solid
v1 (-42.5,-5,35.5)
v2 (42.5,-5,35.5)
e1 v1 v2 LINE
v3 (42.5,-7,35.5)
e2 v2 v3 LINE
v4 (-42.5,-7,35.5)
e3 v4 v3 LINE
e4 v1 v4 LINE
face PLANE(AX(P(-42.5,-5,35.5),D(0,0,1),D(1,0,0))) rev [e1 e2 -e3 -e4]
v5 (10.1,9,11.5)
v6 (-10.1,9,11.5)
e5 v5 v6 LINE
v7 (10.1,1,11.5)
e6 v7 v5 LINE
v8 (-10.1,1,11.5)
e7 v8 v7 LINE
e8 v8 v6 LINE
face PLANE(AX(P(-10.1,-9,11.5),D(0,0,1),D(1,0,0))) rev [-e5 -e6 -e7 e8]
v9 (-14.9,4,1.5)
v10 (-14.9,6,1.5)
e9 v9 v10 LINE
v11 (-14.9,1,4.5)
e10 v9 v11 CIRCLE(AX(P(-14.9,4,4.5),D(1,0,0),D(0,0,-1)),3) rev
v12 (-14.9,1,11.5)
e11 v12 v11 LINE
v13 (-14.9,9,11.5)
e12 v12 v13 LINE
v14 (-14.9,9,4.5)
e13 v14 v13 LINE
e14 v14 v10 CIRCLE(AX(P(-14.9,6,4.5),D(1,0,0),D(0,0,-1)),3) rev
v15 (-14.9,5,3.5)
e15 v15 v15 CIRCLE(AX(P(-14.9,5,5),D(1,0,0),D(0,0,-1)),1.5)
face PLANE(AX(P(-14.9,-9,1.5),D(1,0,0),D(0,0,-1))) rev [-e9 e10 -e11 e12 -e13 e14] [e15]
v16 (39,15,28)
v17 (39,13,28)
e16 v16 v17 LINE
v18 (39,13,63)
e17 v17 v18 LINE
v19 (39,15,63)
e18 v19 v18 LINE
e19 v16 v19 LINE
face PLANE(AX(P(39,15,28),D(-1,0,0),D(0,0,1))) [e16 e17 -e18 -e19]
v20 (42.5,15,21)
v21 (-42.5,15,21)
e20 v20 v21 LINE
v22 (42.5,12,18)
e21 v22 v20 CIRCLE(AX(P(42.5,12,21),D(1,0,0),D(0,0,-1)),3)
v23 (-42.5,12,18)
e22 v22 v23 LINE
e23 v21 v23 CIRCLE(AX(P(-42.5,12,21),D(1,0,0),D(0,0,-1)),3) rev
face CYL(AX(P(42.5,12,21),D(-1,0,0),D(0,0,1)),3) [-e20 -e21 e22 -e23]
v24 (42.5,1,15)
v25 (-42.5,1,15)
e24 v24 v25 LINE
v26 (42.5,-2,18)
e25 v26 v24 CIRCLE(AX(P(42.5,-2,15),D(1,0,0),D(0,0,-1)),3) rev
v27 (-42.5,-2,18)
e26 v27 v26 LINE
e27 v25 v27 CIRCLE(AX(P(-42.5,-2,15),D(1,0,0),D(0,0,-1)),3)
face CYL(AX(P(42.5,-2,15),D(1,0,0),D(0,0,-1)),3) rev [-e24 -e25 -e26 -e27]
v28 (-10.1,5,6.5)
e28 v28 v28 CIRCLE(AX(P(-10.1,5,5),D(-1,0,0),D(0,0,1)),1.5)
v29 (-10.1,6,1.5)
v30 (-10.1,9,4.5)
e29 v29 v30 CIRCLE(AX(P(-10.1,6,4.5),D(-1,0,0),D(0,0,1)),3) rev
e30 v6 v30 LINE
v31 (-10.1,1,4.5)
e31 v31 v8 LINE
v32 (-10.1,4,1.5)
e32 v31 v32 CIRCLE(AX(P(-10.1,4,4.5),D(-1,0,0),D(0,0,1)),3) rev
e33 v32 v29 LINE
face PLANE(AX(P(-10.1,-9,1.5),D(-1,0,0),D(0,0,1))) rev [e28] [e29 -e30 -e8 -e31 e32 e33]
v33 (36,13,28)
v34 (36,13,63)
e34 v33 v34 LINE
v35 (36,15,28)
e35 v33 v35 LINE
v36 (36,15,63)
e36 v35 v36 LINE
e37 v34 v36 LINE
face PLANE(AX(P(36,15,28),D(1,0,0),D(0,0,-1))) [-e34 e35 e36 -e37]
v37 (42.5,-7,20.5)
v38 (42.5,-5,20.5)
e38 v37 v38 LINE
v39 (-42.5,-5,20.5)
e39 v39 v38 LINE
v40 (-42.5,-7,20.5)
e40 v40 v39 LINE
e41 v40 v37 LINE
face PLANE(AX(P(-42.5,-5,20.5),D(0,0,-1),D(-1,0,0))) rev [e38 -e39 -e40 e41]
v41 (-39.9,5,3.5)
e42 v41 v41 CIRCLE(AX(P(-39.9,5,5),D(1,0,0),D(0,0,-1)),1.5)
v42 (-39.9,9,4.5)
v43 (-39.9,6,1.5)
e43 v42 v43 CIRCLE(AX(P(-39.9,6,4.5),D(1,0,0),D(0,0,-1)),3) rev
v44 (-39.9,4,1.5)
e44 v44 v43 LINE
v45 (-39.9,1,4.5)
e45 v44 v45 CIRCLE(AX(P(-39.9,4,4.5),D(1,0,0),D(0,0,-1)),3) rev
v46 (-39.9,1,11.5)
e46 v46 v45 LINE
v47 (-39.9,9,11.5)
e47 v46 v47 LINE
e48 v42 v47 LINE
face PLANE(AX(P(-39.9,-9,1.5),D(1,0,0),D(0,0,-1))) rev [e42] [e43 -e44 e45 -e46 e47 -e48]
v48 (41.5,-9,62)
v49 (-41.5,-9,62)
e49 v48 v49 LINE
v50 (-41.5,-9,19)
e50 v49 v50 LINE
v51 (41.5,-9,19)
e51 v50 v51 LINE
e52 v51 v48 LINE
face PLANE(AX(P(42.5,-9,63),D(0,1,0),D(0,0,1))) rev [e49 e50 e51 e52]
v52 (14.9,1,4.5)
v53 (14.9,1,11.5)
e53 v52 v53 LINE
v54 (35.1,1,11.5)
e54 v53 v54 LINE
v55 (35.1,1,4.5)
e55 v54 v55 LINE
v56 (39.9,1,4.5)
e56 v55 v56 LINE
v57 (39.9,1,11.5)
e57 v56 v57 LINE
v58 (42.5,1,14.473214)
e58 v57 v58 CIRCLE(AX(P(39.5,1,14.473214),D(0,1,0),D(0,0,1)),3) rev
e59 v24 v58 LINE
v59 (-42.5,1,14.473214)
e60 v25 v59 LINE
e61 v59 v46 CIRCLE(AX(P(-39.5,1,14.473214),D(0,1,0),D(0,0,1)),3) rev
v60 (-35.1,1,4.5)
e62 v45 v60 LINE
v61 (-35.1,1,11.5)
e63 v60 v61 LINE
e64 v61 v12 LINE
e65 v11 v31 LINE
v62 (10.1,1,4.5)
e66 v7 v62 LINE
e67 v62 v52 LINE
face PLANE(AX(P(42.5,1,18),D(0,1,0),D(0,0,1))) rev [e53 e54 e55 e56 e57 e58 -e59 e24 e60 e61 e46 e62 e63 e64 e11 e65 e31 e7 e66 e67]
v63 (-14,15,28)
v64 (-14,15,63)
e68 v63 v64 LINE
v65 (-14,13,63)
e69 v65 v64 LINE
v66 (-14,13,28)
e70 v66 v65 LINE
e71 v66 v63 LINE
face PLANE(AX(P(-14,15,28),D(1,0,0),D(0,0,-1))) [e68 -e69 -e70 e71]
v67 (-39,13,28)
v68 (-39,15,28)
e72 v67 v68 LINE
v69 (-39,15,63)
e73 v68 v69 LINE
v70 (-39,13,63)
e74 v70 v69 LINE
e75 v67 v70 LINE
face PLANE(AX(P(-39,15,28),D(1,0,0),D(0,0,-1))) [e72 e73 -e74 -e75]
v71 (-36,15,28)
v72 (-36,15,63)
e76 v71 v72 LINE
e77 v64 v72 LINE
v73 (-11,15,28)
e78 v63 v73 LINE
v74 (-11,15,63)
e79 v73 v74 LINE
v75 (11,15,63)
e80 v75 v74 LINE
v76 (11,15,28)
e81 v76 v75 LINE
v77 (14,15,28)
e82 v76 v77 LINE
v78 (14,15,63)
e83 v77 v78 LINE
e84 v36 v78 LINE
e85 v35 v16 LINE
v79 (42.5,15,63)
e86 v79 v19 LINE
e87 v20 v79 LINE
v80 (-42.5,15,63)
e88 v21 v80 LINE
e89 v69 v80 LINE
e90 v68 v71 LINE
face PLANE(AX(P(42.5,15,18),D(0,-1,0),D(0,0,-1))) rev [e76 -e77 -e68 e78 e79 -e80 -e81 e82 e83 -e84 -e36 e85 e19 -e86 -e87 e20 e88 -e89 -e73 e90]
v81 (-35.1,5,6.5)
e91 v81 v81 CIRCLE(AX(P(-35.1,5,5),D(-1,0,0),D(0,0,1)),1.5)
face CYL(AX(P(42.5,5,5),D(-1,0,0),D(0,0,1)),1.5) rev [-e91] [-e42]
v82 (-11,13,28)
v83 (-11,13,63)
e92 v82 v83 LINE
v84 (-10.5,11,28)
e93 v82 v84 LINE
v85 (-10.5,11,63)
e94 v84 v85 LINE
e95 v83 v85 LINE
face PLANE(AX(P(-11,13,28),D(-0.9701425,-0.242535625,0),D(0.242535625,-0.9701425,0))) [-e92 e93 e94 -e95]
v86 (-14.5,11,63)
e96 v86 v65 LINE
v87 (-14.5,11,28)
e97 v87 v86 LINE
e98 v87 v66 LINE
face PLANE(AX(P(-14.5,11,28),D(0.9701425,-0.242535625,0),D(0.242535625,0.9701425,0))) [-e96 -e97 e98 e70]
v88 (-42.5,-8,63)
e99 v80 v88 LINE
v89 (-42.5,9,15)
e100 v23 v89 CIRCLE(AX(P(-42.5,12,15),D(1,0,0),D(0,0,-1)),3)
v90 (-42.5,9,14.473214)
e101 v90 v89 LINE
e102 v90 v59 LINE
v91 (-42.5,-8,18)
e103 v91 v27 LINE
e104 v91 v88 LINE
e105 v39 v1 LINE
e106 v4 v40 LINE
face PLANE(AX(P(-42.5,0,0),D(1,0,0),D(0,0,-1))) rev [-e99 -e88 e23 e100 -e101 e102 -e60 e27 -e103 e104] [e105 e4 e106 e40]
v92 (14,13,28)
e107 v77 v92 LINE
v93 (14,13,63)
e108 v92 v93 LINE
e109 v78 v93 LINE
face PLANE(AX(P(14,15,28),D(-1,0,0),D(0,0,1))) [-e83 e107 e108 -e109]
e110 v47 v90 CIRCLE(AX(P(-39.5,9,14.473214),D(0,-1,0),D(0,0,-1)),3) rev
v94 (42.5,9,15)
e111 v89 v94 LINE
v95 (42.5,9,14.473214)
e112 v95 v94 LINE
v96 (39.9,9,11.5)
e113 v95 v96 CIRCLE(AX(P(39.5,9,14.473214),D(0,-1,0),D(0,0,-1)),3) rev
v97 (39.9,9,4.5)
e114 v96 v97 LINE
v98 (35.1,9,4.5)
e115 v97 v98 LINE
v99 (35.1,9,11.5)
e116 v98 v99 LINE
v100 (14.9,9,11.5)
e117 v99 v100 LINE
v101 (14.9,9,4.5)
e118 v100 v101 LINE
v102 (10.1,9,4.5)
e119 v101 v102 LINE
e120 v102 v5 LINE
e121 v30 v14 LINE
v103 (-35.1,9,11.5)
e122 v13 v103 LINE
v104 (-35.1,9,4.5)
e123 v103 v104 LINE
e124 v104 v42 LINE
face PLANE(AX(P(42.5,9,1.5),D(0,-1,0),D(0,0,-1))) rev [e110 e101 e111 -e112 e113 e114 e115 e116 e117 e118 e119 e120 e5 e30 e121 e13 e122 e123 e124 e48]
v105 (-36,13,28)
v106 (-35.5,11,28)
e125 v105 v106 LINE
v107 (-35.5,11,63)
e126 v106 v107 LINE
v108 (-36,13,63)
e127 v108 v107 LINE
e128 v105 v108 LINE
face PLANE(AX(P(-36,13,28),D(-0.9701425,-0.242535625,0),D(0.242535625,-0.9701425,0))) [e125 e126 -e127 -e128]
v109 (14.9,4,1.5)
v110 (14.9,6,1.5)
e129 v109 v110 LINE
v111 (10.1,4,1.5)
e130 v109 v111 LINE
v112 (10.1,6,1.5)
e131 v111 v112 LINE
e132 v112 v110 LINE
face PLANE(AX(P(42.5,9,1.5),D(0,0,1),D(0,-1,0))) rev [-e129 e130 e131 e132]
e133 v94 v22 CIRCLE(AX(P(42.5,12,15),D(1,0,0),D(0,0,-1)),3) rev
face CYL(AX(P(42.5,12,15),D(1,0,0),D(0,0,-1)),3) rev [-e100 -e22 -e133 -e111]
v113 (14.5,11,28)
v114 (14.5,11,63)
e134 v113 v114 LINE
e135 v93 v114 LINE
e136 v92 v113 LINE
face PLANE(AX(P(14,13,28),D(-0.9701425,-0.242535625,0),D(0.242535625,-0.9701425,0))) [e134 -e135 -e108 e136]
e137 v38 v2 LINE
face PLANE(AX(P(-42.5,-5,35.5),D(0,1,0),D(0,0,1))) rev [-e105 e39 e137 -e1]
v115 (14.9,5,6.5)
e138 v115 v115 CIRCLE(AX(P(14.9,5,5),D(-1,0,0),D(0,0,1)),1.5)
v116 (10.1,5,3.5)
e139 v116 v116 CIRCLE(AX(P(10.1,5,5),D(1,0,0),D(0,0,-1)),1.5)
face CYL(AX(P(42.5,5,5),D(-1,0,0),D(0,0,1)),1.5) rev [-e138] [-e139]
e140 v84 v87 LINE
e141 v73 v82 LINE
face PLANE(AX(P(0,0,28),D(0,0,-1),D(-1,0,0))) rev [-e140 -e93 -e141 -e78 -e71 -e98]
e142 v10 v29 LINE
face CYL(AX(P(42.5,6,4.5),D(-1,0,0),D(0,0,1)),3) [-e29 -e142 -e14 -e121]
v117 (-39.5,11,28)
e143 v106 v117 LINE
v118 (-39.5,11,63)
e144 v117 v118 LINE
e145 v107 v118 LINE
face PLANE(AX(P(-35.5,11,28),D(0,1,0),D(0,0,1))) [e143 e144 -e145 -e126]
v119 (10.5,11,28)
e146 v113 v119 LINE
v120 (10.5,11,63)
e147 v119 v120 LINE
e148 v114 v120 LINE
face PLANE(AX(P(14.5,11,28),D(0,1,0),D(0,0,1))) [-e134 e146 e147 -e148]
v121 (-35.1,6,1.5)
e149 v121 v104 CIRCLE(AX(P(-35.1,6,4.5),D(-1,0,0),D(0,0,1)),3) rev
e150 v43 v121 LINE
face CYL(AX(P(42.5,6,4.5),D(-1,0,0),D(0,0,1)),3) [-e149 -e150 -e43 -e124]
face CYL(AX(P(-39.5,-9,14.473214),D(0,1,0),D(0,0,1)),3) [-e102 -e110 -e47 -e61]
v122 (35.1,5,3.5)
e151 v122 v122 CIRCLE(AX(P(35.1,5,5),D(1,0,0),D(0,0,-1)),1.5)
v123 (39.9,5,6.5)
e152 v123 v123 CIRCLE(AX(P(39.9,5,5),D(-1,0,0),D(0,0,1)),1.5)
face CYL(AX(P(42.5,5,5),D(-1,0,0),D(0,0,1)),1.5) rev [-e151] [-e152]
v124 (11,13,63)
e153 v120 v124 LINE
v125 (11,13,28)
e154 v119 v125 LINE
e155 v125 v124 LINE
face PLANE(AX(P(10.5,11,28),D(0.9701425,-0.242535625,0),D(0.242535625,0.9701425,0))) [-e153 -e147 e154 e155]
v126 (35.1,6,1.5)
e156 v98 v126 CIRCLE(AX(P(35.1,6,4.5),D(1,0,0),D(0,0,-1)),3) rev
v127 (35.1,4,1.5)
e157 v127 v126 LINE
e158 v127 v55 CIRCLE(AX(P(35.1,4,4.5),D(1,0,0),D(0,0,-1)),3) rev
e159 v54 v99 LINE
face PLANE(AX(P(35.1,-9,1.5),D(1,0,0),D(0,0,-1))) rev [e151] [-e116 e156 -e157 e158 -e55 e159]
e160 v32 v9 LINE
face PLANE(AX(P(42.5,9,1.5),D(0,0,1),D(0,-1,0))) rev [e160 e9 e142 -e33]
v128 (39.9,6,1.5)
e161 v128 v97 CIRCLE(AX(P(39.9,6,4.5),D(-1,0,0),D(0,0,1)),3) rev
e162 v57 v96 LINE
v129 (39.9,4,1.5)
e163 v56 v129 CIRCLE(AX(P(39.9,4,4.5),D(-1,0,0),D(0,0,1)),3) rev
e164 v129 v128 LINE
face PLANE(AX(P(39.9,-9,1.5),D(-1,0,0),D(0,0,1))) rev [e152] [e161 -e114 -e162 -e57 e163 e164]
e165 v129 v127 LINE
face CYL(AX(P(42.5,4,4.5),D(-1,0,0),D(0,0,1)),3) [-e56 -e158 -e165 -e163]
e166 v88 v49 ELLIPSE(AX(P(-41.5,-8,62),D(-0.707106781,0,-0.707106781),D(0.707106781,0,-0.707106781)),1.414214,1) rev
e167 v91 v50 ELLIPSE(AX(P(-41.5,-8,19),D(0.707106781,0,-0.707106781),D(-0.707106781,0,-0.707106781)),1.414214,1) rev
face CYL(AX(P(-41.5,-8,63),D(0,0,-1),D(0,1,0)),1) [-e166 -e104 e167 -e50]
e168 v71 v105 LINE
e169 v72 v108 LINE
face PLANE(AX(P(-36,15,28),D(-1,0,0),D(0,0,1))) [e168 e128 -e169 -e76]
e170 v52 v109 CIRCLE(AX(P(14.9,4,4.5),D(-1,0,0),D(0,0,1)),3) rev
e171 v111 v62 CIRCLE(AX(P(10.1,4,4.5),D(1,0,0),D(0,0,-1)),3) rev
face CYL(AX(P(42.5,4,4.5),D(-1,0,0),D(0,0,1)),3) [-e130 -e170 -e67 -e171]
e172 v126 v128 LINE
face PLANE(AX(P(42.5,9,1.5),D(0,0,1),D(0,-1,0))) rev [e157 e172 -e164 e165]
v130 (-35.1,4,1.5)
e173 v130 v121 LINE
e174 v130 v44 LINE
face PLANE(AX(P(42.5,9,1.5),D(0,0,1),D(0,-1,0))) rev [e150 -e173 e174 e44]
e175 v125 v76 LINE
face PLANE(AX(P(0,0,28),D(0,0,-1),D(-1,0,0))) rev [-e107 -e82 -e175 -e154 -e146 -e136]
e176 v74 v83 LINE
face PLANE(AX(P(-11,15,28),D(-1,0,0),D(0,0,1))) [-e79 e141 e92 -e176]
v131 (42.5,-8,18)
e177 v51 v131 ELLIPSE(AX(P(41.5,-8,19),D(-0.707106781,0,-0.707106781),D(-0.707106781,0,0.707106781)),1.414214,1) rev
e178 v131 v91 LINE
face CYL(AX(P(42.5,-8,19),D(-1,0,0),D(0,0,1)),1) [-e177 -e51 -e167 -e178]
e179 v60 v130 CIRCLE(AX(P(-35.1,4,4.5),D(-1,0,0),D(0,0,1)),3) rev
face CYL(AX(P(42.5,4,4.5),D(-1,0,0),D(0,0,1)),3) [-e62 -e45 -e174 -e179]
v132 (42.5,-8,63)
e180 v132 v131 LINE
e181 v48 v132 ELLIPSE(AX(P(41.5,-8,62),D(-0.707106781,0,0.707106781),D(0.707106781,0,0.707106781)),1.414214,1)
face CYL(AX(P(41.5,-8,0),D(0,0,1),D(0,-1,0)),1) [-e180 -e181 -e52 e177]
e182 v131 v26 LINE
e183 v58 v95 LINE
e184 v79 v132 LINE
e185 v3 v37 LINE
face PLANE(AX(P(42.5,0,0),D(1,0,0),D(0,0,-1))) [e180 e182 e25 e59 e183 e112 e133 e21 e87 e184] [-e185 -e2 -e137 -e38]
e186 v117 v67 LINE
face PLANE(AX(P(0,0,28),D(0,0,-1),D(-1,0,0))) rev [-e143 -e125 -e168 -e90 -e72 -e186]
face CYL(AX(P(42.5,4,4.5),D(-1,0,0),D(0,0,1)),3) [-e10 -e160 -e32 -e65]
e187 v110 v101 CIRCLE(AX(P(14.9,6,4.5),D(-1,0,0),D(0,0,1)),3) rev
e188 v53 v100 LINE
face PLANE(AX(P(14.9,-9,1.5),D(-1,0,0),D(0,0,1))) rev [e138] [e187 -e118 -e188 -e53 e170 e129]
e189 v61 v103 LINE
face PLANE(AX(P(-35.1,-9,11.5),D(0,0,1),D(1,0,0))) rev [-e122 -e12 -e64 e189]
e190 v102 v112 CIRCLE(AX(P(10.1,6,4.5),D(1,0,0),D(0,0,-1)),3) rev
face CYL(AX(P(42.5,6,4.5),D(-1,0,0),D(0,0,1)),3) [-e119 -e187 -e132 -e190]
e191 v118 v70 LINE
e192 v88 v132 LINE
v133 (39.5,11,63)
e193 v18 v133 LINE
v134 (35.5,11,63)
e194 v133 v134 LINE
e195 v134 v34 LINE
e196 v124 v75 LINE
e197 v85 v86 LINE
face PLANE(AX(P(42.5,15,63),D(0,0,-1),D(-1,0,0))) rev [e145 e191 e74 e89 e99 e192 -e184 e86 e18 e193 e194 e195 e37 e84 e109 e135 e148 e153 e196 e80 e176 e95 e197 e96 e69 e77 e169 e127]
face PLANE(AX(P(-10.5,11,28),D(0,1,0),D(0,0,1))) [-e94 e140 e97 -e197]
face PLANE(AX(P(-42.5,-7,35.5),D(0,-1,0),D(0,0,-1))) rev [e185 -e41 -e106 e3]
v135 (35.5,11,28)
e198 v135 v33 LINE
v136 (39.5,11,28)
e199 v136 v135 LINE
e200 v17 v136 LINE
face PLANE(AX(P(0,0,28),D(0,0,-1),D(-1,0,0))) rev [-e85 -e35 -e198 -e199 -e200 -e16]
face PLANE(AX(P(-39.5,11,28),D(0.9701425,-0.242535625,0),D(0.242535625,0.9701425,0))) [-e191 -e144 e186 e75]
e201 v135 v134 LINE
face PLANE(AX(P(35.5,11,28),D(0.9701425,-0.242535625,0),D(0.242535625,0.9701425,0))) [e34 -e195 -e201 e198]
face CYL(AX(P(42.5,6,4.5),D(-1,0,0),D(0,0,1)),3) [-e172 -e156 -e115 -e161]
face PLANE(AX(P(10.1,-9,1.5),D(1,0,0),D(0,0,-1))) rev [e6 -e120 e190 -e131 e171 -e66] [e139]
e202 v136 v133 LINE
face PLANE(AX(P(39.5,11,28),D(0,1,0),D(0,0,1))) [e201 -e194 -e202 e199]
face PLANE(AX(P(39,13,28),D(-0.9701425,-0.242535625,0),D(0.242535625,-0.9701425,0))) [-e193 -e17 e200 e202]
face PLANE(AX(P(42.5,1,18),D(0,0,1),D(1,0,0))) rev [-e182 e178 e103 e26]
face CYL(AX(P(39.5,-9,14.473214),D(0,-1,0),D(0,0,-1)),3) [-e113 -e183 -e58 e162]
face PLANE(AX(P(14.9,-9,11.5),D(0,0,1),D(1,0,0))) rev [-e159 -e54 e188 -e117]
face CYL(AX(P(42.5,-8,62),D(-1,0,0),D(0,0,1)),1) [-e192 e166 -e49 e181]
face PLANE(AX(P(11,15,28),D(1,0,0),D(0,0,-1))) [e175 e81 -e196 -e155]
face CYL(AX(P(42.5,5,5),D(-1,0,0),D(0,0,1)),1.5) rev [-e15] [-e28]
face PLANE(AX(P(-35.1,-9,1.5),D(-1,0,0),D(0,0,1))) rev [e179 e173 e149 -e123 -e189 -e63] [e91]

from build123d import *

# Parameters (mm, degrees)
CROQUIS1_R                 = 1.5
SALIENTE_EXTRUIR1_DEPTH    = 42.5
CORTAR_EXTRUIR1_DEPTH      = 78.46128065
CORTAR_EXTRUIR1_DEPTH_BACK = 78.46128065
CROQUIS2_W                 = 2.6
CROQUIS2_H                 = 10
CROQUIS2_W_2               = 20.2
CORTAR_EXTRUIR4_DEPTH      = 78.46128065
CORTAR_EXTRUIR4_DEPTH_BACK = 78.46128065
CROQUIS4_W                 = 15
CROQUIS4_H                 = 2
REDONDEO3_R                = 3
CORTAR_EXTRUIR6_DEPTH      = 35
REDONDEO2_R                = 1


with BuildPart() as part:
    # Croquis1 → Saliente-Extruir1 (new, symmetric)
    with BuildSketch(Plane(origin=(0, 0, 0), x_dir=(0, 0, -1), z_dir=(1, 0, 0))):
        Polygon((-1.5, 9), (-1.5, 1), (-18, 1), (-18, -9), (-63, -9), (-63, 9), (-63, 15), (-18, 15), (-18, 9), align=None)
        with Locations((-5, 5)):
            Circle(CROQUIS1_R, mode=Mode.SUBTRACT)
    extrude(amount=SALIENTE_EXTRUIR1_DEPTH, both=True)

    # Croquis2 → Cortar-Extruir1 (cut, two sides: drawn at the far end of the back side and taken through both)
    with BuildSketch(Plane(origin=(0, 0, 0), x_dir=(1, 0, 0), z_dir=(0, 1, 0)).offset(-CORTAR_EXTRUIR1_DEPTH_BACK)):
        with Locations((-41.2, -6.5)):
            Rectangle(CROQUIS2_W, CROQUIS2_H)
        with Locations((-25, -6.5)):
            Rectangle(CROQUIS2_W_2, CROQUIS2_H)
        with Locations((0, -6.5)):
            Rectangle(CROQUIS2_W_2, CROQUIS2_H)
        with Locations((25, -6.5)):
            Rectangle(CROQUIS2_W_2, CROQUIS2_H)
        with Locations((41.2, -6.5)):
            Rectangle(CROQUIS2_W, CROQUIS2_H)
    extrude(amount=CORTAR_EXTRUIR1_DEPTH + CORTAR_EXTRUIR1_DEPTH_BACK, mode=Mode.SUBTRACT)

    # Croquis4 → Cortar-Extruir4 (cut, two sides: drawn at the far end of the back side and taken through both)
    with BuildSketch(Plane(origin=(0, 0, 0), x_dir=(0, 0, -1), z_dir=(1, 0, 0)).offset(-CORTAR_EXTRUIR4_DEPTH_BACK)):
        with Locations((-28, -6)):
            Rectangle(CROQUIS4_W, CROQUIS4_H)
    extrude(amount=CORTAR_EXTRUIR4_DEPTH + CORTAR_EXTRUIR4_DEPTH_BACK, mode=Mode.SUBTRACT)

    # Redondeo3
    # the kernel refuses this fillet: 3 mm, written as the material it adds along each edge
    with BuildSketch(Plane(origin=(42.5, 1, 18), x_dir=(0, 0, -1), z_dir=(-1, 0, 0)), Plane(origin=(-42.5, 9, 18), x_dir=(0, 0, -1), z_dir=(1, 0, 0))) as redondeo3_piece_1:
        with BuildLine():
            CenterArc((REDONDEO3_R, REDONDEO3_R), REDONDEO3_R, 180, 90)
            Line((0, REDONDEO3_R), (0, 0))
            Line((0, 0), (REDONDEO3_R, 0))
        make_face()
    extrude(amount=85)
    # the kernel refuses this fillet: 3 mm, written as the material it takes off along each edge
    with BuildSketch(Plane(origin=(-47.4, 9, 1.5), x_dir=(0, -1, 0), z_dir=(1, 0, 0)), Plane(origin=(-27.6, 1, 1.5), x_dir=(0, 1, 0), z_dir=(-1, 0, 0))) as redondeo3_2_piece_1:
        with BuildLine():
            CenterArc((REDONDEO3_R, -REDONDEO3_R), REDONDEO3_R, 90, 90)
            Line((0, -REDONDEO3_R), (0, 0))
            Line((0, 0), (REDONDEO3_R, 0))
        make_face()
    extrude(amount=19.8, mode=Mode.SUBTRACT)
    with BuildSketch(Plane(origin=(27.6, 9, 1.5), x_dir=(0, 0, 1), z_dir=(1, 0, 0)), Plane(origin=(47.4, 1, 1.5), x_dir=(0, 0, 1), z_dir=(-1, 0, 0)), Plane(origin=(2.6, 9, 1.5), x_dir=(0, 0, 1), z_dir=(1, 0, 0)), Plane(origin=(22.4, 1, 1.5), x_dir=(0, 0, 1), z_dir=(-1, 0, 0)), Plane(origin=(-22.4, 9, 1.5), x_dir=(0, 0, 1), z_dir=(1, 0, 0)), Plane(origin=(-2.6, 1, 1.5), x_dir=(0, 0, 1), z_dir=(-1, 0, 0))) as redondeo3_2_piece_2:
        with BuildLine():
            CenterArc((REDONDEO3_R, REDONDEO3_R), REDONDEO3_R, 180, 90)
            Line((0, REDONDEO3_R), (0, 0))
            Line((0, 0), (REDONDEO3_R, 0))
        make_face()
    extrude(amount=19.8, mode=Mode.SUBTRACT)
    with BuildSketch(Plane(origin=(42.5, -6.433034374, 11.5), x_dir=(0, 0, 1), z_dir=(0, 1, 0))) as redondeo3_2_piece_3:
        with BuildLine():
            CenterArc((2.973213749, -3), REDONDEO3_R, 90, 82.337744339)
            Line((0, -2.6), (0, 0))
            Line((0, 0), (2.973213749, 0))
        make_face()
    extrude(amount=22.866068747, mode=Mode.SUBTRACT)
    with BuildSketch(Plane(origin=(-42.5, 16.433034374, 11.5), x_dir=(1, 0, 0), z_dir=(0, -1, 0))) as redondeo3_2_piece_4:
        with BuildLine():
            CenterArc((3, 2.973213749), REDONDEO3_R, 180, 82.337744339)
            Line((0, 2.973213749), (0, 0))
            Line((0, 0), (2.6, 0))
        make_face()
    extrude(amount=22.866068747, mode=Mode.SUBTRACT)
    with BuildSketch(Plane(origin=(-50, 15, 18), x_dir=(0, -1, 0), z_dir=(1, 0, 0))) as redondeo3_2_piece_5:
        with BuildLine():
            CenterArc((REDONDEO3_R, -REDONDEO3_R), REDONDEO3_R, 90, 90)
            Line((0, -REDONDEO3_R), (0, 0))
            Line((0, 0), (REDONDEO3_R, 0))
        make_face()
    extrude(amount=100, mode=Mode.SUBTRACT)

    # Croquis5 → Cortar-Extruir6 (cut)
    with BuildSketch(Plane(origin=(0, 0, 63), x_dir=(-1, 0, 0), z_dir=(0, 0, -1))):
        Polygon((11, 13), (10.5, 11), (14.5, 11), (14, 13), (14, 15), (11, 15), align=None)
        Polygon((-39, 13), (-39.5, 11), (-35.5, 11), (-36, 13), (-36, 15), (-39, 15), align=None)
        Polygon((36, 15), (39, 15), (39, 13), (39.5, 11), (35.5, 11), (36, 13), align=None)
        Polygon((-11, 15), (-14, 15), (-14, 13), (-14.5, 11), (-10.5, 11), (-11, 13), align=None)
    extrude(amount=CORTAR_EXTRUIR6_DEPTH, mode=Mode.SUBTRACT)

    # Redondeo2
    redondeo2_edges = [part.edges().sort_by_distance(p)[0] for p in [
        (-42.5, -9, 40.5),
        (0, -9, 18),
        (0, -9, 63),
        (42.5, -9, 40.5),
    ]]
    fillet(redondeo2_edges, radius=REDONDEO2_R)


solid = part.part
